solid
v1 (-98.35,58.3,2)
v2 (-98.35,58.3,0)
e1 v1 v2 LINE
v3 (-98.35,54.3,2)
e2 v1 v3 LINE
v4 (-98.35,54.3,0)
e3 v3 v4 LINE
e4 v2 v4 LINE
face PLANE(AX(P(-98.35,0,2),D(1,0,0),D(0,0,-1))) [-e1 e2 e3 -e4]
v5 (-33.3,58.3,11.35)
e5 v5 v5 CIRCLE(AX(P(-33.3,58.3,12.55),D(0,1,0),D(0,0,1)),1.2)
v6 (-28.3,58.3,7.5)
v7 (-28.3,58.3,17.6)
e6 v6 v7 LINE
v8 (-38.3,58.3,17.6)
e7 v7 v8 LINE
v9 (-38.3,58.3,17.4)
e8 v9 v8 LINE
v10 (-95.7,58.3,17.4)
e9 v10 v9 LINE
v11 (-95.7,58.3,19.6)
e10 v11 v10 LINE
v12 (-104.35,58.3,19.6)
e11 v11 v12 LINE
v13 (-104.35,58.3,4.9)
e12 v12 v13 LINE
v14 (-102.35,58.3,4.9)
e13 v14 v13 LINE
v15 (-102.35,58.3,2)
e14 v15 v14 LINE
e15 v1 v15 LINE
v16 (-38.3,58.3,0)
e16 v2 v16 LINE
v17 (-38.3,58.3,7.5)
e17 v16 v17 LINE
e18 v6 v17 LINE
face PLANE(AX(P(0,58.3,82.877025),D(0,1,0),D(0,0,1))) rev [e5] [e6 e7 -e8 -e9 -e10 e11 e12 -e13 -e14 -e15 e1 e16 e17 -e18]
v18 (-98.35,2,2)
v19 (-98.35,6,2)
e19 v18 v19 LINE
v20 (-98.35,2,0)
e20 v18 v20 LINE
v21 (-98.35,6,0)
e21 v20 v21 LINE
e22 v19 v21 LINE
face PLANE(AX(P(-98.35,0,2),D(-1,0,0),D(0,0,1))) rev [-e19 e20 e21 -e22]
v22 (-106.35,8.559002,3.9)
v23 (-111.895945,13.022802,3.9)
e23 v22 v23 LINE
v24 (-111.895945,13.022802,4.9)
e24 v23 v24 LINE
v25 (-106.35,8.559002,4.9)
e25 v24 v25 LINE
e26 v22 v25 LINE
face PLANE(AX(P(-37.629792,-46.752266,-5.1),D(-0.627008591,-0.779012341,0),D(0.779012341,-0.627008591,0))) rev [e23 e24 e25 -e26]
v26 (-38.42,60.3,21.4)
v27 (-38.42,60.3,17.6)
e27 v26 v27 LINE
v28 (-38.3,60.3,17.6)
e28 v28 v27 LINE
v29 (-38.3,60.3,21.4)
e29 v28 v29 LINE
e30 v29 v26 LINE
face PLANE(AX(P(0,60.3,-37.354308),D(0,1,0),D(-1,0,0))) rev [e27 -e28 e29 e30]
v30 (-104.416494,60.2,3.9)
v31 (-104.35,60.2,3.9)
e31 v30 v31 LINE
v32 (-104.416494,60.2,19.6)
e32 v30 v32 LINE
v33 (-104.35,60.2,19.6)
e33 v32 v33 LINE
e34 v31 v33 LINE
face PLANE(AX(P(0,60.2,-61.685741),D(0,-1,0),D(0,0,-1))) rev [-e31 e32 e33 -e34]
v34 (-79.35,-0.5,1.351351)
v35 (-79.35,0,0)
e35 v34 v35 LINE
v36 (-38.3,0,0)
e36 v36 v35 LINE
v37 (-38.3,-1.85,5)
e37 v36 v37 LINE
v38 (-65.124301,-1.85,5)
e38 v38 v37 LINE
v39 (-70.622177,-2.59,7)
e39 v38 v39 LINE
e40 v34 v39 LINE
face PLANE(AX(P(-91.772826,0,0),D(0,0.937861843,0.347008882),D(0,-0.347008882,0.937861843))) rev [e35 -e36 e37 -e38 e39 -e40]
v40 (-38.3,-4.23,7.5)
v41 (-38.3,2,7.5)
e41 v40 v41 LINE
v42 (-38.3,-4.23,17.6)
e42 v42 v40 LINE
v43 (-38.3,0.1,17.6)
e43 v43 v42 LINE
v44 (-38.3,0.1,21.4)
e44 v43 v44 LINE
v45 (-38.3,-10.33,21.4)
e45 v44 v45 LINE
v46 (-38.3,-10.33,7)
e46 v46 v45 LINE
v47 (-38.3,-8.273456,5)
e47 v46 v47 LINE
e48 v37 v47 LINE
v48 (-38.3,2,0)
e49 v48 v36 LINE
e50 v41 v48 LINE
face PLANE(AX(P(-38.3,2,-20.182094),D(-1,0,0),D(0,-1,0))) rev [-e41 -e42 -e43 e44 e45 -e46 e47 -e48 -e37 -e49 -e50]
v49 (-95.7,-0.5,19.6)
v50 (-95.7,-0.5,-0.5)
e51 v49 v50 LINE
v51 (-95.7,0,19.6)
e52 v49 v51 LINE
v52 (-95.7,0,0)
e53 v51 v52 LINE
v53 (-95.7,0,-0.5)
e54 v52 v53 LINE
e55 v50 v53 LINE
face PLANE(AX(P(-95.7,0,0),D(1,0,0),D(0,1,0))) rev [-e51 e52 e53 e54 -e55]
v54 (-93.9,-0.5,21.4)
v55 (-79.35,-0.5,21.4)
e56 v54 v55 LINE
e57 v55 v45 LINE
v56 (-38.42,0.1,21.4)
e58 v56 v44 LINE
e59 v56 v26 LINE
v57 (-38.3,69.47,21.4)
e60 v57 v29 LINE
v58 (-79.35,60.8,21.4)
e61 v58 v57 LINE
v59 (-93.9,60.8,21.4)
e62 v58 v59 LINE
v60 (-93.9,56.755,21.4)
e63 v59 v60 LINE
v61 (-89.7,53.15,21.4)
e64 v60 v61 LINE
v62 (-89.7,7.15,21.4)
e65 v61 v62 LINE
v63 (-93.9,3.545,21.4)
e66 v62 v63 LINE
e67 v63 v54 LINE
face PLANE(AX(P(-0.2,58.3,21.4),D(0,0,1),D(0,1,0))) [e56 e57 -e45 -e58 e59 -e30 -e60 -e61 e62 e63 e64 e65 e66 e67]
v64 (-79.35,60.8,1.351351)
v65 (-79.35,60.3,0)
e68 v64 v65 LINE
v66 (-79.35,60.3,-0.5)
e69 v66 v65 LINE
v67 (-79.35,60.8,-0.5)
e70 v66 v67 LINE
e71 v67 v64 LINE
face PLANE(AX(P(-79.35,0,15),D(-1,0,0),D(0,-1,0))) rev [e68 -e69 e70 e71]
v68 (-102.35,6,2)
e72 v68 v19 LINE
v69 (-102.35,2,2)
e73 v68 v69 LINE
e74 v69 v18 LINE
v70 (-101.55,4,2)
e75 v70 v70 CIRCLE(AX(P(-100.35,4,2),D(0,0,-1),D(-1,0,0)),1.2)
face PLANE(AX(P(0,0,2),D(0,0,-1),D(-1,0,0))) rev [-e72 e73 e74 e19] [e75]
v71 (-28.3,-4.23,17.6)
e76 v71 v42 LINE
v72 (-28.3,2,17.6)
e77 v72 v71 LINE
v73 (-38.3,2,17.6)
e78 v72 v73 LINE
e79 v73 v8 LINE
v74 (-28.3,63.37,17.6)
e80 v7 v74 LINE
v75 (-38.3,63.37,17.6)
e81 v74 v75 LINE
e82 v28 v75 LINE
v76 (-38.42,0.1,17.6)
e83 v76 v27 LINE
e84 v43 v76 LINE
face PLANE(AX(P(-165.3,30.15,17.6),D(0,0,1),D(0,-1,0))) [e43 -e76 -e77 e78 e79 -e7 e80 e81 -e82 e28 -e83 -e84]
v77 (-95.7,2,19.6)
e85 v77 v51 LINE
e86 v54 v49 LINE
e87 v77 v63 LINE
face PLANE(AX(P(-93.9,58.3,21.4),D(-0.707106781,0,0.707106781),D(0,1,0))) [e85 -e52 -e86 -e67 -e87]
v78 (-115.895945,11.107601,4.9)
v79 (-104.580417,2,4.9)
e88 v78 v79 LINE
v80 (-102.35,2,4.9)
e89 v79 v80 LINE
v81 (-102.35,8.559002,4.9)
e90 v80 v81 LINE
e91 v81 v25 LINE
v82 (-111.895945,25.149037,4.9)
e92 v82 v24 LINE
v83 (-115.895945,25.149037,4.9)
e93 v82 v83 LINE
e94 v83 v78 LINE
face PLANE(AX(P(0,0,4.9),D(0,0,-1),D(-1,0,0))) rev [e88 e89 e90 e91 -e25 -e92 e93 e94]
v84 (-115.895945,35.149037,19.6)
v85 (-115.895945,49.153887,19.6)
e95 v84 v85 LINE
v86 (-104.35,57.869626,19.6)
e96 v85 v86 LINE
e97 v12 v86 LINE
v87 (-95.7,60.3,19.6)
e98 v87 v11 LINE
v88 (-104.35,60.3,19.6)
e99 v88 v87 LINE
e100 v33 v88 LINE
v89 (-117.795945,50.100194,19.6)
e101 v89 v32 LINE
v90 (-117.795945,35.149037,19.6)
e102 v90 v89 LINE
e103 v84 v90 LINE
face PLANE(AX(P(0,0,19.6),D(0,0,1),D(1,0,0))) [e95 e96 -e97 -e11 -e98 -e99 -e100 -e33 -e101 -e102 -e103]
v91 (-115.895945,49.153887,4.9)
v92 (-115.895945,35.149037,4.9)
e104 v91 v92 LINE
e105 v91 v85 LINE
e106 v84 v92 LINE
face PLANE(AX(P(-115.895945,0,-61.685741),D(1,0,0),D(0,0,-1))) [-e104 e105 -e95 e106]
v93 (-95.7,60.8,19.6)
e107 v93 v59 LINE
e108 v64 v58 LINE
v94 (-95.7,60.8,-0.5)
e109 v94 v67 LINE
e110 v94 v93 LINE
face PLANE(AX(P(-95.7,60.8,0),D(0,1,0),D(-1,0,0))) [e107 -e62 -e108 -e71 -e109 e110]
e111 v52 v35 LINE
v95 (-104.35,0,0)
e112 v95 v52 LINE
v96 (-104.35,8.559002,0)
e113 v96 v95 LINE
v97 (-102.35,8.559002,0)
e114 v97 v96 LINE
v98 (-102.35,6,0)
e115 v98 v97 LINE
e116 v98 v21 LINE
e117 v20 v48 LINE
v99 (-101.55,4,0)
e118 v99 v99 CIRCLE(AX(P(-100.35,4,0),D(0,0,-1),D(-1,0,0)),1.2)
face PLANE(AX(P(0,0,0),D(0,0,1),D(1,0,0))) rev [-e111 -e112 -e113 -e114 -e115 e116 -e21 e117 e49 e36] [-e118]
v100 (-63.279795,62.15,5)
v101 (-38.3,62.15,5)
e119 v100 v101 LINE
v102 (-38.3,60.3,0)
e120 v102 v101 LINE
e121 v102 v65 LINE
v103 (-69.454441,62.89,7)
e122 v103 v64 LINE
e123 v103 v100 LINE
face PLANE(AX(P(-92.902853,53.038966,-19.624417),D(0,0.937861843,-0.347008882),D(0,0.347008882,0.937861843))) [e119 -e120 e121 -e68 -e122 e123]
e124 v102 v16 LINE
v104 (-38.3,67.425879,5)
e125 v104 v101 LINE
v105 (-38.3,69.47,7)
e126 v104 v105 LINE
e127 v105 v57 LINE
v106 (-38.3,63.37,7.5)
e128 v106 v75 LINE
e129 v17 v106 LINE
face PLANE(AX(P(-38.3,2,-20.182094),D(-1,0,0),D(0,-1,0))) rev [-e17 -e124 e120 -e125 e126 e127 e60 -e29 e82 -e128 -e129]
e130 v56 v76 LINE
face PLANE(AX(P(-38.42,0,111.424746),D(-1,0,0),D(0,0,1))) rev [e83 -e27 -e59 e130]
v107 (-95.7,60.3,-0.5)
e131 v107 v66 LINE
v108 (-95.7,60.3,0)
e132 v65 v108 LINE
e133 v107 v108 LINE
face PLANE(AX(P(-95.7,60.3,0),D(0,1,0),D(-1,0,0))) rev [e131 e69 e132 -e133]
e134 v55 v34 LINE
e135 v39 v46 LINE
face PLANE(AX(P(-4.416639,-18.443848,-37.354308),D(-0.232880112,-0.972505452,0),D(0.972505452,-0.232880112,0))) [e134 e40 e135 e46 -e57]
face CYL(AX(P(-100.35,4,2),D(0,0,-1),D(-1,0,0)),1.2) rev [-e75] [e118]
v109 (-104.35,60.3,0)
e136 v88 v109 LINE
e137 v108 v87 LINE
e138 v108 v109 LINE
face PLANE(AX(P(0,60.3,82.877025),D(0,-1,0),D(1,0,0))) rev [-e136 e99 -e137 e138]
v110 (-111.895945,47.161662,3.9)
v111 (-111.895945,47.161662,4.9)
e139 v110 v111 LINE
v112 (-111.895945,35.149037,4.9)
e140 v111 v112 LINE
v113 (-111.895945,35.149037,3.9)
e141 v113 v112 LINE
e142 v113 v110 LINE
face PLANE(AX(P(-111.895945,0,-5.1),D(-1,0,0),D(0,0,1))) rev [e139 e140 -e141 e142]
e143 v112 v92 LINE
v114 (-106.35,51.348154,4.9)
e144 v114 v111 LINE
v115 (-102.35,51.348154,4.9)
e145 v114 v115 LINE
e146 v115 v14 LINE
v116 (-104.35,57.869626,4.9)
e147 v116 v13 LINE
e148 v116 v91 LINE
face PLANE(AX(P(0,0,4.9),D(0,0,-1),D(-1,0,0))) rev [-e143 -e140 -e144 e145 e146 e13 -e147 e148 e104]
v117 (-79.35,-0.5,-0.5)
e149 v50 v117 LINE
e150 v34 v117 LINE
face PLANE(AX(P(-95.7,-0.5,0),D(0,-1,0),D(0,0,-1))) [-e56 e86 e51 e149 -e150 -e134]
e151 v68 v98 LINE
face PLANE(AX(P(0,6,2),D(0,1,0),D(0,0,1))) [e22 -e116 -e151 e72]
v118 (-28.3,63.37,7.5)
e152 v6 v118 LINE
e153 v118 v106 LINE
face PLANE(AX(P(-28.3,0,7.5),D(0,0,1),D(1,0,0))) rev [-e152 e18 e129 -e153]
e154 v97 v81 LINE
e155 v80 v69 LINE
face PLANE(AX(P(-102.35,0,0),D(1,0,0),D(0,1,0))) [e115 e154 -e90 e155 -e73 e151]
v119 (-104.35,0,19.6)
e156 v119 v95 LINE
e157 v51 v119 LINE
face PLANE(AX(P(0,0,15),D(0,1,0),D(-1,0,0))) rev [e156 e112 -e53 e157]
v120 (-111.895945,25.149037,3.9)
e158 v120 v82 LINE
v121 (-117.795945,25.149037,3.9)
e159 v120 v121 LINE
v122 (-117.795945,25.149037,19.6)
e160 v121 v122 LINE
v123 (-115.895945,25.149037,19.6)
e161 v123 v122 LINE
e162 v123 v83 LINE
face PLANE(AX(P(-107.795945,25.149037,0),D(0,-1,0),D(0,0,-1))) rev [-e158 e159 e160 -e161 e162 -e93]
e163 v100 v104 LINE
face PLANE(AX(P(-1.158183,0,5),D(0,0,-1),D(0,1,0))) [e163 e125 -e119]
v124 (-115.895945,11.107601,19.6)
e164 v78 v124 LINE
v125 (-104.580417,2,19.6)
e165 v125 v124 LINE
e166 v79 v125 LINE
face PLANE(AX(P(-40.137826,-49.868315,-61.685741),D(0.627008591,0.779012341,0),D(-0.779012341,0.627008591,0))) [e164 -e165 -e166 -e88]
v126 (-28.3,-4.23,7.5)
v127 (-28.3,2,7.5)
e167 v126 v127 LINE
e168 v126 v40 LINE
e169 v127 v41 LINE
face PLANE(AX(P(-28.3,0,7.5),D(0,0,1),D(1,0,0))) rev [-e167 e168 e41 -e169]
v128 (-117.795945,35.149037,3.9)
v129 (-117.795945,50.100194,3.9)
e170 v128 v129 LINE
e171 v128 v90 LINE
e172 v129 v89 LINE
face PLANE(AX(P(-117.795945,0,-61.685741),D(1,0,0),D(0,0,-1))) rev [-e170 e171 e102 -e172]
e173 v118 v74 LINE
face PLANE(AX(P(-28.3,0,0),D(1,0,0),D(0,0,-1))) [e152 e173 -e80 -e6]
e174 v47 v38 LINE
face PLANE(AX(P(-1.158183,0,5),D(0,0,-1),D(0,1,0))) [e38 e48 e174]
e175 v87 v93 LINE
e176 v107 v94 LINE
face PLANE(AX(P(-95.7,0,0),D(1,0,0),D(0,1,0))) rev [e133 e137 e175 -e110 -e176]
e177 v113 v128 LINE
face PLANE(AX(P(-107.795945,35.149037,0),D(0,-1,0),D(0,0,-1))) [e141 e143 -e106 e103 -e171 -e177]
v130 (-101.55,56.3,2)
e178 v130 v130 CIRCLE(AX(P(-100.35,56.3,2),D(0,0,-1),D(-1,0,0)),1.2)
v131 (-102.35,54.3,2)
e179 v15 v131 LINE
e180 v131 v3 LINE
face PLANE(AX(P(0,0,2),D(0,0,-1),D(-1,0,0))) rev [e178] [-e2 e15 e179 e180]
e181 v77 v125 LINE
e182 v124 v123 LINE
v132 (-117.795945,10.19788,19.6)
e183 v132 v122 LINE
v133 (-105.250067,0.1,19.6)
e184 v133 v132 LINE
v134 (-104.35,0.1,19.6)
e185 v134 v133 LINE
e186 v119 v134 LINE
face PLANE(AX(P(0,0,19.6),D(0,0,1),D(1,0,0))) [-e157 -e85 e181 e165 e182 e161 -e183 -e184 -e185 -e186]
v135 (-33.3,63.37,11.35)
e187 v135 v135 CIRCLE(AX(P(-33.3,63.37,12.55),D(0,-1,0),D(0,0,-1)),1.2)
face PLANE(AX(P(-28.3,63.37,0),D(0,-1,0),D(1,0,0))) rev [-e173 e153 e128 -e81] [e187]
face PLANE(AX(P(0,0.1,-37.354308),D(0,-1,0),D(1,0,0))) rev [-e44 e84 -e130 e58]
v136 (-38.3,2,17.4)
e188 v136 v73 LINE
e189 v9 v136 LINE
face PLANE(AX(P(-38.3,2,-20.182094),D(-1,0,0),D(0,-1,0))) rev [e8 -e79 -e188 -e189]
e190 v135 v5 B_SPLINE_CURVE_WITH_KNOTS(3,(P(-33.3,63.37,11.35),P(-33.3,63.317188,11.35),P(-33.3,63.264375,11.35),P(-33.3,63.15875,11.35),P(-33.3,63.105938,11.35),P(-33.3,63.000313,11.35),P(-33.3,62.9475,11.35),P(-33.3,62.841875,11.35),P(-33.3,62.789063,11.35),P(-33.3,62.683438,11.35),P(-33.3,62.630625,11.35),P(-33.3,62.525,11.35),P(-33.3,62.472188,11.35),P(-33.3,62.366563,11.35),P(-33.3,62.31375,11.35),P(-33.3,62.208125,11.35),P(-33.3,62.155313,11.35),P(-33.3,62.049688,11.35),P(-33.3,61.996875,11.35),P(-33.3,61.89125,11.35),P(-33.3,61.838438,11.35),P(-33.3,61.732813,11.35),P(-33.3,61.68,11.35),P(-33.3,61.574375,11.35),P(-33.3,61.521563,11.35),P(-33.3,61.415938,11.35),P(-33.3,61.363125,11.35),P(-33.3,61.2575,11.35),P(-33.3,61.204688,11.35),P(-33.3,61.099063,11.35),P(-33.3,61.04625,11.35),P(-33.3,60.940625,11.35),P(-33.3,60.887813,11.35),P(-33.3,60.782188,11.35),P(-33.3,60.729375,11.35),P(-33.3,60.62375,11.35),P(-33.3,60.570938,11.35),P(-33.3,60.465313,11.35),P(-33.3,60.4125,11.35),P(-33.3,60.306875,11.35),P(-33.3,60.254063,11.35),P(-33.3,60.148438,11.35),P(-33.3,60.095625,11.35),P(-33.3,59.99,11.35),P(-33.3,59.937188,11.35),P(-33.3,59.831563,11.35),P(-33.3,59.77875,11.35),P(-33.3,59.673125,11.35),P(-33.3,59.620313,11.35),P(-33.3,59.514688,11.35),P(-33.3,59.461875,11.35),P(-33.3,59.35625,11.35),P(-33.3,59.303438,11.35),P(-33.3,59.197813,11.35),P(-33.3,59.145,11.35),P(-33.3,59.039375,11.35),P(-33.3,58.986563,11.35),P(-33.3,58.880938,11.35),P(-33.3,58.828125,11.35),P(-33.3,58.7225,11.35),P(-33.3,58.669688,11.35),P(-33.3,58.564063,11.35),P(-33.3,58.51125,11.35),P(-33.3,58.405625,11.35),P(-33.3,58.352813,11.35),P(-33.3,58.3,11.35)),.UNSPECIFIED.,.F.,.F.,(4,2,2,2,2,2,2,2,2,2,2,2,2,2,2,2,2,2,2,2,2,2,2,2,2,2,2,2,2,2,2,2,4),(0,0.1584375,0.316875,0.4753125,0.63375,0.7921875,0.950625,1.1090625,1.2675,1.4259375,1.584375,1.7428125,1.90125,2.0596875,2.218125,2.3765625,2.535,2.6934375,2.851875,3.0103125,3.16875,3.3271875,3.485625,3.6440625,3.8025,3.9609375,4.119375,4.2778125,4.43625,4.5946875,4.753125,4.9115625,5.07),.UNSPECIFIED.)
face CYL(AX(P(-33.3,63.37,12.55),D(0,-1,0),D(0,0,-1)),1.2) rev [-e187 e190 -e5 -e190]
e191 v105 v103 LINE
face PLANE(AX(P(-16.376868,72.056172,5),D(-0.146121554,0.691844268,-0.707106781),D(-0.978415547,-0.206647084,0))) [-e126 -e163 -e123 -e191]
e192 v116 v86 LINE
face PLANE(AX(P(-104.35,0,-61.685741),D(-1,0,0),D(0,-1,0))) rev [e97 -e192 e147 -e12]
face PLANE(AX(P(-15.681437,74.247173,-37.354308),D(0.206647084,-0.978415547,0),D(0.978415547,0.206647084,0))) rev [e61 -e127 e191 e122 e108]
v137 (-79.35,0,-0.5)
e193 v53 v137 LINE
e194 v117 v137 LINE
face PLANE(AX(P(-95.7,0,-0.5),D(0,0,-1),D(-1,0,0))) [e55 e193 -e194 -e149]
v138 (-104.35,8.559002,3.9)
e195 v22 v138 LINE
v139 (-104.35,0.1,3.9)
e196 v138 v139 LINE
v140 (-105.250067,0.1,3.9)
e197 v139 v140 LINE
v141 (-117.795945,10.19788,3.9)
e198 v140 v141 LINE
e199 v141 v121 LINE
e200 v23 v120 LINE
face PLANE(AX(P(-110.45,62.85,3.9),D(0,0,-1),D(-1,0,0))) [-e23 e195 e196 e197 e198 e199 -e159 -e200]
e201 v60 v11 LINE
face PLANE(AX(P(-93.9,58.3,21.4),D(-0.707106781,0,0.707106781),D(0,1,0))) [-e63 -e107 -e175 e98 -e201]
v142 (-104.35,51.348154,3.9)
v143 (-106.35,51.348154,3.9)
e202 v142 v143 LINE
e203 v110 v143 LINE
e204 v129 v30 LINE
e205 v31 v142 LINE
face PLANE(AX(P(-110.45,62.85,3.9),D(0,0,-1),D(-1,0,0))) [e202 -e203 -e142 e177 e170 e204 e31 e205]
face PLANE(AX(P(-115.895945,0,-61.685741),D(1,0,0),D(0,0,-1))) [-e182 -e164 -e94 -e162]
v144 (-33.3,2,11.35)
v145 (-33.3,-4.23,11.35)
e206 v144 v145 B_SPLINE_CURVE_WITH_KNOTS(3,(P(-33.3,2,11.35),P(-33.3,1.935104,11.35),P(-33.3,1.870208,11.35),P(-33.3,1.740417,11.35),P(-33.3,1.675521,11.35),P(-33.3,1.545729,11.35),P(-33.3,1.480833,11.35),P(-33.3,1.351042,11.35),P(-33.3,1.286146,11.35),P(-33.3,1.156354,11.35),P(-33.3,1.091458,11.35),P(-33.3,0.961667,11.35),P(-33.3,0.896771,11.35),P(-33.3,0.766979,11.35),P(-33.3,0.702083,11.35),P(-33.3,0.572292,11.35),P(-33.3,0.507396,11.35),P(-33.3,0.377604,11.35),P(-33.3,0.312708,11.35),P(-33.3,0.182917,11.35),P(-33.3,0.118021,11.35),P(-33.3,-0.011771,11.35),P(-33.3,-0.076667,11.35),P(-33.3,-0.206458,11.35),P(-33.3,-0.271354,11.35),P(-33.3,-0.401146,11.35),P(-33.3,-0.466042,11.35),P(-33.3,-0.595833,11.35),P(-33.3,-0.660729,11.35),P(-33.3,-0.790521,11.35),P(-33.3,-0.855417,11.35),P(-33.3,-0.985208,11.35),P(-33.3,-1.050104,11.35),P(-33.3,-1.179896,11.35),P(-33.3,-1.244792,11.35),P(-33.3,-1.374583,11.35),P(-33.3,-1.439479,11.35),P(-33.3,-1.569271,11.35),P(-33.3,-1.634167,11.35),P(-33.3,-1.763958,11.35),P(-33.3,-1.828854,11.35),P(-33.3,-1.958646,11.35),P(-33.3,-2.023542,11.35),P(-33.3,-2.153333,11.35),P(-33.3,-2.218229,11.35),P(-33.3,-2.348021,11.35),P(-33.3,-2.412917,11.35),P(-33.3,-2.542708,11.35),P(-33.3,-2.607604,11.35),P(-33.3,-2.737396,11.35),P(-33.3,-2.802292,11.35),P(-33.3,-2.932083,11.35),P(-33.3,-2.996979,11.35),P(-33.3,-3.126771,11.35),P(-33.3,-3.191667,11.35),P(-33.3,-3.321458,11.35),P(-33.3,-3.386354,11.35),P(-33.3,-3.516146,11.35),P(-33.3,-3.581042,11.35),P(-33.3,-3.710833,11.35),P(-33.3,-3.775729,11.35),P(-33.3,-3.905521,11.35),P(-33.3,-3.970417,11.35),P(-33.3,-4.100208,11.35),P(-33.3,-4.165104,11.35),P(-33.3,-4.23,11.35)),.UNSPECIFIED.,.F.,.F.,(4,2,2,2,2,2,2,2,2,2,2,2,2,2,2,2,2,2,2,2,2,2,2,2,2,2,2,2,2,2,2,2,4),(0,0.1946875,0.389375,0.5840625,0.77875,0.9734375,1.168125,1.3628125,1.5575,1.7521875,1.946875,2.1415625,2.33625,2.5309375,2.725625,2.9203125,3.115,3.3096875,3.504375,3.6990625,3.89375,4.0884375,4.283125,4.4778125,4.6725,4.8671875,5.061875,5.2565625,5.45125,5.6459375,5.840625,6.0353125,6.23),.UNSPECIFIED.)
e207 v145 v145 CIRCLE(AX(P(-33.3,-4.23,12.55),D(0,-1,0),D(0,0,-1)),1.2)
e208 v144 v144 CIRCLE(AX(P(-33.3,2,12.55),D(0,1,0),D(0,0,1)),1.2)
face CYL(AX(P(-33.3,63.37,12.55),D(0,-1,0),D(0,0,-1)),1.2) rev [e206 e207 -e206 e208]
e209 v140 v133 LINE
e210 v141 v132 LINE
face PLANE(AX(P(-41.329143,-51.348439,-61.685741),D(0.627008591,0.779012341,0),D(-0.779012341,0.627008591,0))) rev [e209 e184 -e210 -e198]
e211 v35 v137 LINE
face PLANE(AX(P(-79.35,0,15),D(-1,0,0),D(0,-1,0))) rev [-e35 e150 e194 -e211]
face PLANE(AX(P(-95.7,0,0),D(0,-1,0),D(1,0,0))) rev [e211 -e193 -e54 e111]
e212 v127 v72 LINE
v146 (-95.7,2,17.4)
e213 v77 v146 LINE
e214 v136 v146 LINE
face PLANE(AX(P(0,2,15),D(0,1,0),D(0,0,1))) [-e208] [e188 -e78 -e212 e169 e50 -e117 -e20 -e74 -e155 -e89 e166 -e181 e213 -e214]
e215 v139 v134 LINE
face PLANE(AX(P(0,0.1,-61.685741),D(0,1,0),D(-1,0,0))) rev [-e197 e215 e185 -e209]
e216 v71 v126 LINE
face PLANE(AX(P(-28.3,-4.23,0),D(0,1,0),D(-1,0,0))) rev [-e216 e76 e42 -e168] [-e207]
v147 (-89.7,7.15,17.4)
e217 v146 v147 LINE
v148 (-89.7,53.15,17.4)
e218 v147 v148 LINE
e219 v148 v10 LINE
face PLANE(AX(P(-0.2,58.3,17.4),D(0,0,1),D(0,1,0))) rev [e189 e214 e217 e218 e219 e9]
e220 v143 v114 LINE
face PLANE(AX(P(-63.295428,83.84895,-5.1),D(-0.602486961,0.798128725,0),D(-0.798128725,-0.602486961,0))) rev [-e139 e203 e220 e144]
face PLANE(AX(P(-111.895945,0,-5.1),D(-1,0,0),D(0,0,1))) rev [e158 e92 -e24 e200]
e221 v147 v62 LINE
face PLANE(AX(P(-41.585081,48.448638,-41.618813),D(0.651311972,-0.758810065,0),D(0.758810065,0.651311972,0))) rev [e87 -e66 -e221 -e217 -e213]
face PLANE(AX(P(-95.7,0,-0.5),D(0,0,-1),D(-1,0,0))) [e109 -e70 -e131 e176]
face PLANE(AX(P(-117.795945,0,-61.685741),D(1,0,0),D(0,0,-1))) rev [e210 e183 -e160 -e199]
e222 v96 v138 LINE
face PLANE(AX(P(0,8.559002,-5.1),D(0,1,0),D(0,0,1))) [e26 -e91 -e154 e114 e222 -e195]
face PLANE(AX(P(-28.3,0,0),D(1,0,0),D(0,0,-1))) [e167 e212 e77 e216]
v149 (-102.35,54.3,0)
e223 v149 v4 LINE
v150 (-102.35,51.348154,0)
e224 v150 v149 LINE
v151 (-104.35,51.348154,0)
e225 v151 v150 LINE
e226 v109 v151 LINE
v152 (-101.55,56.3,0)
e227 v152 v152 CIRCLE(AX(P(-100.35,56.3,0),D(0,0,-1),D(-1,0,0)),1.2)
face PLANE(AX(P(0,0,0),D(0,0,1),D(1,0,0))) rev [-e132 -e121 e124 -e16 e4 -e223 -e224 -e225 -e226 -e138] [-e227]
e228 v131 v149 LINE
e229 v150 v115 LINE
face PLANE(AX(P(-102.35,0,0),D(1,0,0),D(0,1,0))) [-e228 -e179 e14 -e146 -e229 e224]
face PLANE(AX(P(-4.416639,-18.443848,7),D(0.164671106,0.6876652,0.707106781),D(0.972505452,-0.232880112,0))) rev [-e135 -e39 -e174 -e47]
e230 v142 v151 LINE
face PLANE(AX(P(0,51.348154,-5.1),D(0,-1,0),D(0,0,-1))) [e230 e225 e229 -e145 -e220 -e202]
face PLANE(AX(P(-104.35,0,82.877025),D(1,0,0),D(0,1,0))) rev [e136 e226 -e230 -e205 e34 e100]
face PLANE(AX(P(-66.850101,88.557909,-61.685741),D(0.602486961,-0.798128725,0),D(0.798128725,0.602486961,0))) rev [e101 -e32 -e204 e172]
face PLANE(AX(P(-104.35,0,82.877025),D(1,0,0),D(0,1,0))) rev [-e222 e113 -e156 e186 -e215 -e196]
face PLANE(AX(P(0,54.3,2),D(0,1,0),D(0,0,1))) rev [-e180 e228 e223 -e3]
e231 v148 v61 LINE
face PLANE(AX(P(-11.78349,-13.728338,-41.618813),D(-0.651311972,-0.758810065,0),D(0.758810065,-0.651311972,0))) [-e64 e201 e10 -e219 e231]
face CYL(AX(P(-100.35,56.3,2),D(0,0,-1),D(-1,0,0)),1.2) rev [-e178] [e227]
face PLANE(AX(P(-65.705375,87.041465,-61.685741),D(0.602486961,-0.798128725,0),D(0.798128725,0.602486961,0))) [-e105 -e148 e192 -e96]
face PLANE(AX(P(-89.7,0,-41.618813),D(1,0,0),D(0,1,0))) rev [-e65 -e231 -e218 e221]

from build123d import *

# Parameters (mm, degrees)
SKETCH_2_W               = 25
SKETCH_2_H               = 2
EXTRUDE_1_DEPTH          = 15
EXTRUDE_1_2_DEPTH        = 15
EXTRUDE_2_DEPTH          = 2.6
EXTRUDE_3_DEPTH          = 15.7
EXTRUDE_4_DEPTH          = 1
EXTRUDE_5_DEPTH          = 2
SKETCH_7_W               = 2
SKETCH_7_H               = 56.3
EXTRUDE_6_DEPTH          = 3.9
SKETCH_8_W               = 4
SKETCH_8_H               = 4
SKETCH_8_R               = 1.2
EXTRUDE_7_DEPTH          = 2
EXTRUDE_START            = -16.35
EXTRUDE_8_DEPTH          = 16.35
CUT_EXTRUDE_1_DEPTH      = 2.6
EXTRUDE_9_DEPTH          = 41.05
SKETCH_12_W              = 10.1
SKETCH_12_H              = 3.07
EXTRUDE_10_DEPTH         = 10
CUT_EXTRUDE_2_DEPTH      = 135.796311397
CUT_EXTRUDE_2_DEPTH_BACK = 135.796311397
EXTRUDE_11_DEPTH         = 3.8
SKETCH_15_W              = 8.65
SKETCH_15_H              = 2
CUT_EXTRUDE_3_DEPTH      = 1.8
CUT_EXTRUDE_4_DEPTH      = 2.4
EXTRUDE_12_DEPTH         = 16.399999999
EXTRUDE_13_REACH         = 109.72
EXTRUDE_14_REACH         = 109.72
CHAMFER_1_SIZE           = 2
CHAMFER_3_SIZE           = 1.8
SKETCH_20_W              = 4
SKETCH_20_H              = 42.789151816
CUT_EXTRUDE_5_DEPTH      = 10
SKETCH_21_W              = 15.7
SKETCH_21_H              = 10
CUT_EXTRUDE_6_DEPTH      = 10


with BuildPart() as part:
    # 草图2 → 凸台-拉伸1 (new body)
    with BuildSketch(Plane.XY):
        with Locations((-91.85, 1)):
            Rectangle(SKETCH_2_W, SKETCH_2_H)
    extrude(amount=EXTRUDE_1_DEPTH)



with BuildPart() as body_2:
    # 草图2 → Extrude 1 2 (new body)
    with BuildSketch(Plane.XY):
        with Locations((-91.85, 59.3)):
            Rectangle(SKETCH_2_W, SKETCH_2_H)
    extrude(amount=EXTRUDE_1_2_DEPTH)


with BuildPart() as part_1:
    add(part.part)

    add(body_2.part)  # 凸台-拉伸2 merges body 2
    # 草图3 → 凸台-拉伸2 (add)
    with BuildSketch(Plane.XY.offset(15)):
        Polygon((-95.7, 2), (-104.35, 2), (-104.35, 0), (-79.35, 0), (-79.35, 60.3), (-104.35, 60.3), (-104.35, 58.3), (-95.7, 58.3), align=None)
    extrude(amount=EXTRUDE_2_DEPTH)

    # 草图4 → 凸台-拉伸3 (add)
    with BuildSketch(Plane.XY.offset(19.6)):
        Polygon((-104.35, 2), (-104.580416833, 2), (-115.895945033, 11.107600771), (-115.895945033, 49.153887402), (-104.35, 57.869625998), (-104.35, 58.3), (-104.35, 60.2), (-104.416493669, 60.2), (-117.795945033, 50.10019437), (-117.795945033, 10.197880039), (-105.250067231, 0.1), (-104.35, 0.1), align=None)
    extrude(amount=-EXTRUDE_3_DEPTH)

    # 草图5 → 凸台-拉伸4 (add)
    with BuildSketch(Plane(origin=(0, 0, 3.9), x_dir=(-1, 0, 0), z_dir=(0, 0, -1))):
        Polygon((104.35, 2), (104.35, 57.869625998), (115.895945033, 49.153887402), (115.895945033, 11.107600771), (104.580416833, 2), align=None)
    extrude(amount=-EXTRUDE_4_DEPTH)

    # 草图6 → 凸台-拉伸5 (add)
    with BuildSketch(Plane(origin=(-104.35, 0, 0), x_dir=(0, 0, -1), z_dir=(1, 0, 0))):
        Polygon((-4.9, 58.3), (-4.9, 57.869625998), (-4.9, 2), (-3.9, 2), (-3.9, 58.3), align=None)
    extrude(amount=EXTRUDE_5_DEPTH)

    # 草图7 → 凸台-拉伸6 (add)
    with BuildSketch(Plane(origin=(0, 0, 3.9), x_dir=(-1, 0, 0), z_dir=(0, 0, -1))):
        with Locations((103.35, 30.15)):
            Rectangle(SKETCH_7_W, SKETCH_7_H)
    extrude(amount=EXTRUDE_6_DEPTH)

    # 草图8 → 凸台-拉伸7 (add)
    # profile 1 of 2: a face of its own
    with BuildSketch(Plane(origin=(0, 0, 0), x_dir=(-1, 0, 0), z_dir=(0, 0, -1))):
        with Locations((100.35, 56.3)):
            Rectangle(SKETCH_8_W, SKETCH_8_H)
        with Locations((100.35, 56.3)):
            Circle(SKETCH_8_R, mode=Mode.SUBTRACT)
    # profile 2 of 2: a face of its own
    with BuildSketch(Plane(origin=(0, 0, 0), x_dir=(-1, 0, 0), z_dir=(0, 0, -1))):
        with Locations((100.35, 4)):
            Rectangle(SKETCH_8_W, SKETCH_8_H)
        with Locations((100.35, 4)):
            Circle(SKETCH_8_R, mode=Mode.SUBTRACT)
    extrude(amount=-EXTRUDE_7_DEPTH)

    # 草图9 → 凸台-拉伸8 (add)
    with BuildSketch(Plane(origin=(-79.35, 0, 0), x_dir=(0, 0, -1), z_dir=(1, 0, 0)).offset(EXTRUDE_START)):
        Polygon((-17.6, 0), (-17.6, -0.5), (0.5, -0.5), (0.5, 0), (0, 0), align=None)
        Polygon((-17.6, 60.8), (-17.6, 60.3), (0, 60.3), (0.5, 60.3), (0.5, 60.8), align=None)
    extrude(amount=EXTRUDE_8_DEPTH)

    # 草图10 → 切除-拉伸1 (cut)
    with BuildSketch(Plane.XY.offset(17.6)):
        Polygon((-95.7, 58.3), (-89.7, 53.15), (-89.7, 7.15), (-95.7, 2), align=None)
    extrude(amount=-CUT_EXTRUDE_1_DEPTH, mode=Mode.SUBTRACT)

    # 草图11 → 凸台-拉伸9 (add)
    with BuildSketch(Plane(origin=(-79.35, 0, 0), x_dir=(0, 0, -1), z_dir=(1, 0, 0))):
        Polygon((-17.6, 0.1), (0, 0), (0, 2), (-15, 2), (-15, 58.3), (0, 58.3), (0, 60.3), (-17.6, 60.3), align=None)
    extrude(amount=EXTRUDE_9_DEPTH)

    # 草图12 → 凸台-拉伸10 (add)
    with BuildSketch(Plane(origin=(-38.3, 0, 0), x_dir=(0, 0, -1), z_dir=(1, 0, 0))):
        Polygon((-7.5, 0.042613636), (-7.5, 2), (-15, 2), (-17.6, 2), (-17.6, 0.1), align=None)
        Polygon((-7.5, -4.23), (-7.5, 0.042613636), (-17.6, 0.1), (-17.6, -4.23), align=None)
        with Locations((-12.55, 61.835)):
            Rectangle(SKETCH_12_W, SKETCH_12_H)
        Polygon((-15, 58.3), (-7.5, 58.3), (-7.5, 60.3), (-17.6, 60.3), (-17.6, 58.3), align=None)
    extrude(amount=EXTRUDE_10_DEPTH)

    # 草图13 → 切除-拉伸2 (cut, two sides: drawn at the far end of the back side and taken through both)
    with BuildSketch(Plane.XZ.offset(-58.3).offset(-CUT_EXTRUDE_2_DEPTH_BACK)):
        with BuildLine():
            ThreePointArc((-32.1, 12.55), (-32.838023478, 13.657509681), (-34.144296155, 13.402739117))
            Line((-34.144296155, 13.402739117), (-32.455703844, 11.697260883))
            ThreePointArc((-32.455703844, 11.697260883), (-32.192490319, 12.088023478), (-32.1, 12.55))
        make_face()
        with BuildLine():
            Line((-32.455703844, 11.697260883), (-34.144296155, 13.402739117))
            ThreePointArc((-34.144296155, 13.402739117), (-34.152739117, 11.705703844), (-32.455703844, 11.697260883))
        make_face()
    extrude(amount=CUT_EXTRUDE_2_DEPTH + CUT_EXTRUDE_2_DEPTH_BACK, mode=Mode.SUBTRACT)

    # 草图14 → 凸台-拉伸11 (add)
    with BuildSketch(Plane.XY.offset(17.6)):
        Polygon((-79.35, 0.1), (-38.42, 0.1), (-38.42, 2), (-38.42, 58.3), (-38.42, 60.3), (-79.35, 60.3), (-79.35, 60.8), (-95.7, 60.8), (-95.7, 60.3), (-104.35, 60.3), (-104.35, 60.2), (-104.35, 58.3), (-95.7, 58.3), (-89.7, 53.15), (-89.7, 7.15), (-95.7, 2), (-104.35, 2), (-104.35, 0.1), (-104.35, 0), (-95.7, 0), (-95.7, -0.5), (-79.35, -0.5), align=None)
    extrude(amount=EXTRUDE_11_DEPTH)

    # 草图15 → 切除-拉伸3 (cut)
    with BuildSketch(Plane.XY.offset(21.4)):
        with Locations((-100.025, 59.3)):
            Rectangle(SKETCH_15_W, SKETCH_15_H)
        with Locations((-100.025, 1)):
            Rectangle(SKETCH_15_W, SKETCH_15_H)
    extrude(amount=-CUT_EXTRUDE_3_DEPTH, mode=Mode.SUBTRACT)

    # 草图16 → 切除-拉伸4 (cut)
    with BuildSketch(Plane(origin=(0, 0, 15), x_dir=(-1, 0, 0), z_dir=(0, 0, -1))):
        Polygon((89.7, 53.15), (95.7, 58.3), (38.3, 58.3), (38.3, 2), (95.7, 2), (89.7, 7.15), align=None)
    extrude(amount=-CUT_EXTRUDE_4_DEPTH, mode=Mode.SUBTRACT)

    # 草图17 → 凸台-拉伸12 (add)
    with BuildSketch(Plane.XY.offset(21.4)):
        Polygon((-38.42, 60.3), (-38.3, 60.3), (-38.3, 69.47), (-79.35, 60.8), (-79.35, 60.3), align=None)
        Polygon((-79.35, -0.5), (-38.3, -10.33), (-38.3, 0.1), (-38.42, 0.1), (-79.35, 0.1), align=None)
    extrude(amount=-EXTRUDE_12_DEPTH)

    # 凸台-拉伸13: up to this plane
    extrude_13_end = Plane(origin=(-15.681436973, 74.247172751, -37.354307927), z_dir=(0.20664708387422698, -0.9784155470587527, 0))
    # 草图18 → 凸台-拉伸13 (add, up to the surface)
    with BuildSketch(Plane(origin=(-38.3, 0, 0), x_dir=(0, 0, -1), z_dir=(1, 0, 0)), mode=Mode.PRIVATE) as extrude_13_sk1:
        Polygon((-5.000000001, 60.3), (0, 60.3), (-5, 62.15), align=None)
    extrude_13_tool1 = split(extrude(extrude_13_sk1.sketch, amount=-EXTRUDE_13_REACH, mode=Mode.PRIVATE), bisect_by=extrude_13_end, keep=Keep.BOTH, mode=Mode.PRIVATE)
    add(extrude_13_tool1.solids().sort_by_distance((-38.3, 60.916667, 3.333333))[0])

    # 凸台-拉伸14: up to this plane
    extrude_14_end = Plane(origin=(-4.416638762, -18.443847527, -37.354307927), z_dir=(-0.23288011181129656, -0.9725054516673715, 0))
    # 草图19 → 凸台-拉伸14 (add, up to the surface)
    with BuildSketch(Plane(origin=(-38.3, 0, 0), x_dir=(0, 0, -1), z_dir=(1, 0, 0)), mode=Mode.PRIVATE) as extrude_14_sk1:
        Polygon((-5, -1.85), (0, 0), (-5, 0.028409091), align=None)
    extrude_14_tool1 = split(extrude(extrude_14_sk1.sketch, amount=-EXTRUDE_14_REACH, mode=Mode.PRIVATE), bisect_by=extrude_14_end, keep=Keep.BOTH, mode=Mode.PRIVATE)
    add(extrude_14_tool1.solids().sort_by_distance((-38.3, -0.607197, 3.333333))[0])

    # 倒角1
    chamfer_1_edges = [part_1.edges().sort_by_distance(p)[0] for p in [
        (-55.629065744, 65.81, 5.000000001),
        (-56.006205493, -6.09, 5.000000001),
    ]]
    chamfer(chamfer_1_edges, length=CHAMFER_1_SIZE)

    # 倒角3
    chamfer_3_edges = [part_1.edges().sort_by_distance(p)[0] for p in [
        (-95.7, 59.55, 21.4),
        (-95.7, 0.75, 21.4),
    ]]
    chamfer(chamfer_3_edges, length=CHAMFER_3_SIZE - 0.0001)  # a hair under: the kernel refuses the full size

    # 草图20 → 切除-拉伸5 (cut)
    with BuildSketch(Plane.XY.offset(4.9)):
        Polygon((-106.35, 8.559002447), (-106.35, 51.348154263), (-111.895945033, 47.161662205), (-111.895945033, 13.022802313), align=None)
        with Locations((-104.35, 29.953578355)):
            Rectangle(SKETCH_20_W, SKETCH_20_H)
    extrude(amount=-CUT_EXTRUDE_5_DEPTH, mode=Mode.SUBTRACT)

    # 草图21 → 切除-拉伸6 (cut)
    with BuildSketch(Plane.ZY.offset(117.795945033)):
        with Locations((11.75, 30.149037204)):
            Rectangle(SKETCH_21_W, SKETCH_21_H)
    extrude(amount=-CUT_EXTRUDE_6_DEPTH, mode=Mode.SUBTRACT)


solid = part_1.part
